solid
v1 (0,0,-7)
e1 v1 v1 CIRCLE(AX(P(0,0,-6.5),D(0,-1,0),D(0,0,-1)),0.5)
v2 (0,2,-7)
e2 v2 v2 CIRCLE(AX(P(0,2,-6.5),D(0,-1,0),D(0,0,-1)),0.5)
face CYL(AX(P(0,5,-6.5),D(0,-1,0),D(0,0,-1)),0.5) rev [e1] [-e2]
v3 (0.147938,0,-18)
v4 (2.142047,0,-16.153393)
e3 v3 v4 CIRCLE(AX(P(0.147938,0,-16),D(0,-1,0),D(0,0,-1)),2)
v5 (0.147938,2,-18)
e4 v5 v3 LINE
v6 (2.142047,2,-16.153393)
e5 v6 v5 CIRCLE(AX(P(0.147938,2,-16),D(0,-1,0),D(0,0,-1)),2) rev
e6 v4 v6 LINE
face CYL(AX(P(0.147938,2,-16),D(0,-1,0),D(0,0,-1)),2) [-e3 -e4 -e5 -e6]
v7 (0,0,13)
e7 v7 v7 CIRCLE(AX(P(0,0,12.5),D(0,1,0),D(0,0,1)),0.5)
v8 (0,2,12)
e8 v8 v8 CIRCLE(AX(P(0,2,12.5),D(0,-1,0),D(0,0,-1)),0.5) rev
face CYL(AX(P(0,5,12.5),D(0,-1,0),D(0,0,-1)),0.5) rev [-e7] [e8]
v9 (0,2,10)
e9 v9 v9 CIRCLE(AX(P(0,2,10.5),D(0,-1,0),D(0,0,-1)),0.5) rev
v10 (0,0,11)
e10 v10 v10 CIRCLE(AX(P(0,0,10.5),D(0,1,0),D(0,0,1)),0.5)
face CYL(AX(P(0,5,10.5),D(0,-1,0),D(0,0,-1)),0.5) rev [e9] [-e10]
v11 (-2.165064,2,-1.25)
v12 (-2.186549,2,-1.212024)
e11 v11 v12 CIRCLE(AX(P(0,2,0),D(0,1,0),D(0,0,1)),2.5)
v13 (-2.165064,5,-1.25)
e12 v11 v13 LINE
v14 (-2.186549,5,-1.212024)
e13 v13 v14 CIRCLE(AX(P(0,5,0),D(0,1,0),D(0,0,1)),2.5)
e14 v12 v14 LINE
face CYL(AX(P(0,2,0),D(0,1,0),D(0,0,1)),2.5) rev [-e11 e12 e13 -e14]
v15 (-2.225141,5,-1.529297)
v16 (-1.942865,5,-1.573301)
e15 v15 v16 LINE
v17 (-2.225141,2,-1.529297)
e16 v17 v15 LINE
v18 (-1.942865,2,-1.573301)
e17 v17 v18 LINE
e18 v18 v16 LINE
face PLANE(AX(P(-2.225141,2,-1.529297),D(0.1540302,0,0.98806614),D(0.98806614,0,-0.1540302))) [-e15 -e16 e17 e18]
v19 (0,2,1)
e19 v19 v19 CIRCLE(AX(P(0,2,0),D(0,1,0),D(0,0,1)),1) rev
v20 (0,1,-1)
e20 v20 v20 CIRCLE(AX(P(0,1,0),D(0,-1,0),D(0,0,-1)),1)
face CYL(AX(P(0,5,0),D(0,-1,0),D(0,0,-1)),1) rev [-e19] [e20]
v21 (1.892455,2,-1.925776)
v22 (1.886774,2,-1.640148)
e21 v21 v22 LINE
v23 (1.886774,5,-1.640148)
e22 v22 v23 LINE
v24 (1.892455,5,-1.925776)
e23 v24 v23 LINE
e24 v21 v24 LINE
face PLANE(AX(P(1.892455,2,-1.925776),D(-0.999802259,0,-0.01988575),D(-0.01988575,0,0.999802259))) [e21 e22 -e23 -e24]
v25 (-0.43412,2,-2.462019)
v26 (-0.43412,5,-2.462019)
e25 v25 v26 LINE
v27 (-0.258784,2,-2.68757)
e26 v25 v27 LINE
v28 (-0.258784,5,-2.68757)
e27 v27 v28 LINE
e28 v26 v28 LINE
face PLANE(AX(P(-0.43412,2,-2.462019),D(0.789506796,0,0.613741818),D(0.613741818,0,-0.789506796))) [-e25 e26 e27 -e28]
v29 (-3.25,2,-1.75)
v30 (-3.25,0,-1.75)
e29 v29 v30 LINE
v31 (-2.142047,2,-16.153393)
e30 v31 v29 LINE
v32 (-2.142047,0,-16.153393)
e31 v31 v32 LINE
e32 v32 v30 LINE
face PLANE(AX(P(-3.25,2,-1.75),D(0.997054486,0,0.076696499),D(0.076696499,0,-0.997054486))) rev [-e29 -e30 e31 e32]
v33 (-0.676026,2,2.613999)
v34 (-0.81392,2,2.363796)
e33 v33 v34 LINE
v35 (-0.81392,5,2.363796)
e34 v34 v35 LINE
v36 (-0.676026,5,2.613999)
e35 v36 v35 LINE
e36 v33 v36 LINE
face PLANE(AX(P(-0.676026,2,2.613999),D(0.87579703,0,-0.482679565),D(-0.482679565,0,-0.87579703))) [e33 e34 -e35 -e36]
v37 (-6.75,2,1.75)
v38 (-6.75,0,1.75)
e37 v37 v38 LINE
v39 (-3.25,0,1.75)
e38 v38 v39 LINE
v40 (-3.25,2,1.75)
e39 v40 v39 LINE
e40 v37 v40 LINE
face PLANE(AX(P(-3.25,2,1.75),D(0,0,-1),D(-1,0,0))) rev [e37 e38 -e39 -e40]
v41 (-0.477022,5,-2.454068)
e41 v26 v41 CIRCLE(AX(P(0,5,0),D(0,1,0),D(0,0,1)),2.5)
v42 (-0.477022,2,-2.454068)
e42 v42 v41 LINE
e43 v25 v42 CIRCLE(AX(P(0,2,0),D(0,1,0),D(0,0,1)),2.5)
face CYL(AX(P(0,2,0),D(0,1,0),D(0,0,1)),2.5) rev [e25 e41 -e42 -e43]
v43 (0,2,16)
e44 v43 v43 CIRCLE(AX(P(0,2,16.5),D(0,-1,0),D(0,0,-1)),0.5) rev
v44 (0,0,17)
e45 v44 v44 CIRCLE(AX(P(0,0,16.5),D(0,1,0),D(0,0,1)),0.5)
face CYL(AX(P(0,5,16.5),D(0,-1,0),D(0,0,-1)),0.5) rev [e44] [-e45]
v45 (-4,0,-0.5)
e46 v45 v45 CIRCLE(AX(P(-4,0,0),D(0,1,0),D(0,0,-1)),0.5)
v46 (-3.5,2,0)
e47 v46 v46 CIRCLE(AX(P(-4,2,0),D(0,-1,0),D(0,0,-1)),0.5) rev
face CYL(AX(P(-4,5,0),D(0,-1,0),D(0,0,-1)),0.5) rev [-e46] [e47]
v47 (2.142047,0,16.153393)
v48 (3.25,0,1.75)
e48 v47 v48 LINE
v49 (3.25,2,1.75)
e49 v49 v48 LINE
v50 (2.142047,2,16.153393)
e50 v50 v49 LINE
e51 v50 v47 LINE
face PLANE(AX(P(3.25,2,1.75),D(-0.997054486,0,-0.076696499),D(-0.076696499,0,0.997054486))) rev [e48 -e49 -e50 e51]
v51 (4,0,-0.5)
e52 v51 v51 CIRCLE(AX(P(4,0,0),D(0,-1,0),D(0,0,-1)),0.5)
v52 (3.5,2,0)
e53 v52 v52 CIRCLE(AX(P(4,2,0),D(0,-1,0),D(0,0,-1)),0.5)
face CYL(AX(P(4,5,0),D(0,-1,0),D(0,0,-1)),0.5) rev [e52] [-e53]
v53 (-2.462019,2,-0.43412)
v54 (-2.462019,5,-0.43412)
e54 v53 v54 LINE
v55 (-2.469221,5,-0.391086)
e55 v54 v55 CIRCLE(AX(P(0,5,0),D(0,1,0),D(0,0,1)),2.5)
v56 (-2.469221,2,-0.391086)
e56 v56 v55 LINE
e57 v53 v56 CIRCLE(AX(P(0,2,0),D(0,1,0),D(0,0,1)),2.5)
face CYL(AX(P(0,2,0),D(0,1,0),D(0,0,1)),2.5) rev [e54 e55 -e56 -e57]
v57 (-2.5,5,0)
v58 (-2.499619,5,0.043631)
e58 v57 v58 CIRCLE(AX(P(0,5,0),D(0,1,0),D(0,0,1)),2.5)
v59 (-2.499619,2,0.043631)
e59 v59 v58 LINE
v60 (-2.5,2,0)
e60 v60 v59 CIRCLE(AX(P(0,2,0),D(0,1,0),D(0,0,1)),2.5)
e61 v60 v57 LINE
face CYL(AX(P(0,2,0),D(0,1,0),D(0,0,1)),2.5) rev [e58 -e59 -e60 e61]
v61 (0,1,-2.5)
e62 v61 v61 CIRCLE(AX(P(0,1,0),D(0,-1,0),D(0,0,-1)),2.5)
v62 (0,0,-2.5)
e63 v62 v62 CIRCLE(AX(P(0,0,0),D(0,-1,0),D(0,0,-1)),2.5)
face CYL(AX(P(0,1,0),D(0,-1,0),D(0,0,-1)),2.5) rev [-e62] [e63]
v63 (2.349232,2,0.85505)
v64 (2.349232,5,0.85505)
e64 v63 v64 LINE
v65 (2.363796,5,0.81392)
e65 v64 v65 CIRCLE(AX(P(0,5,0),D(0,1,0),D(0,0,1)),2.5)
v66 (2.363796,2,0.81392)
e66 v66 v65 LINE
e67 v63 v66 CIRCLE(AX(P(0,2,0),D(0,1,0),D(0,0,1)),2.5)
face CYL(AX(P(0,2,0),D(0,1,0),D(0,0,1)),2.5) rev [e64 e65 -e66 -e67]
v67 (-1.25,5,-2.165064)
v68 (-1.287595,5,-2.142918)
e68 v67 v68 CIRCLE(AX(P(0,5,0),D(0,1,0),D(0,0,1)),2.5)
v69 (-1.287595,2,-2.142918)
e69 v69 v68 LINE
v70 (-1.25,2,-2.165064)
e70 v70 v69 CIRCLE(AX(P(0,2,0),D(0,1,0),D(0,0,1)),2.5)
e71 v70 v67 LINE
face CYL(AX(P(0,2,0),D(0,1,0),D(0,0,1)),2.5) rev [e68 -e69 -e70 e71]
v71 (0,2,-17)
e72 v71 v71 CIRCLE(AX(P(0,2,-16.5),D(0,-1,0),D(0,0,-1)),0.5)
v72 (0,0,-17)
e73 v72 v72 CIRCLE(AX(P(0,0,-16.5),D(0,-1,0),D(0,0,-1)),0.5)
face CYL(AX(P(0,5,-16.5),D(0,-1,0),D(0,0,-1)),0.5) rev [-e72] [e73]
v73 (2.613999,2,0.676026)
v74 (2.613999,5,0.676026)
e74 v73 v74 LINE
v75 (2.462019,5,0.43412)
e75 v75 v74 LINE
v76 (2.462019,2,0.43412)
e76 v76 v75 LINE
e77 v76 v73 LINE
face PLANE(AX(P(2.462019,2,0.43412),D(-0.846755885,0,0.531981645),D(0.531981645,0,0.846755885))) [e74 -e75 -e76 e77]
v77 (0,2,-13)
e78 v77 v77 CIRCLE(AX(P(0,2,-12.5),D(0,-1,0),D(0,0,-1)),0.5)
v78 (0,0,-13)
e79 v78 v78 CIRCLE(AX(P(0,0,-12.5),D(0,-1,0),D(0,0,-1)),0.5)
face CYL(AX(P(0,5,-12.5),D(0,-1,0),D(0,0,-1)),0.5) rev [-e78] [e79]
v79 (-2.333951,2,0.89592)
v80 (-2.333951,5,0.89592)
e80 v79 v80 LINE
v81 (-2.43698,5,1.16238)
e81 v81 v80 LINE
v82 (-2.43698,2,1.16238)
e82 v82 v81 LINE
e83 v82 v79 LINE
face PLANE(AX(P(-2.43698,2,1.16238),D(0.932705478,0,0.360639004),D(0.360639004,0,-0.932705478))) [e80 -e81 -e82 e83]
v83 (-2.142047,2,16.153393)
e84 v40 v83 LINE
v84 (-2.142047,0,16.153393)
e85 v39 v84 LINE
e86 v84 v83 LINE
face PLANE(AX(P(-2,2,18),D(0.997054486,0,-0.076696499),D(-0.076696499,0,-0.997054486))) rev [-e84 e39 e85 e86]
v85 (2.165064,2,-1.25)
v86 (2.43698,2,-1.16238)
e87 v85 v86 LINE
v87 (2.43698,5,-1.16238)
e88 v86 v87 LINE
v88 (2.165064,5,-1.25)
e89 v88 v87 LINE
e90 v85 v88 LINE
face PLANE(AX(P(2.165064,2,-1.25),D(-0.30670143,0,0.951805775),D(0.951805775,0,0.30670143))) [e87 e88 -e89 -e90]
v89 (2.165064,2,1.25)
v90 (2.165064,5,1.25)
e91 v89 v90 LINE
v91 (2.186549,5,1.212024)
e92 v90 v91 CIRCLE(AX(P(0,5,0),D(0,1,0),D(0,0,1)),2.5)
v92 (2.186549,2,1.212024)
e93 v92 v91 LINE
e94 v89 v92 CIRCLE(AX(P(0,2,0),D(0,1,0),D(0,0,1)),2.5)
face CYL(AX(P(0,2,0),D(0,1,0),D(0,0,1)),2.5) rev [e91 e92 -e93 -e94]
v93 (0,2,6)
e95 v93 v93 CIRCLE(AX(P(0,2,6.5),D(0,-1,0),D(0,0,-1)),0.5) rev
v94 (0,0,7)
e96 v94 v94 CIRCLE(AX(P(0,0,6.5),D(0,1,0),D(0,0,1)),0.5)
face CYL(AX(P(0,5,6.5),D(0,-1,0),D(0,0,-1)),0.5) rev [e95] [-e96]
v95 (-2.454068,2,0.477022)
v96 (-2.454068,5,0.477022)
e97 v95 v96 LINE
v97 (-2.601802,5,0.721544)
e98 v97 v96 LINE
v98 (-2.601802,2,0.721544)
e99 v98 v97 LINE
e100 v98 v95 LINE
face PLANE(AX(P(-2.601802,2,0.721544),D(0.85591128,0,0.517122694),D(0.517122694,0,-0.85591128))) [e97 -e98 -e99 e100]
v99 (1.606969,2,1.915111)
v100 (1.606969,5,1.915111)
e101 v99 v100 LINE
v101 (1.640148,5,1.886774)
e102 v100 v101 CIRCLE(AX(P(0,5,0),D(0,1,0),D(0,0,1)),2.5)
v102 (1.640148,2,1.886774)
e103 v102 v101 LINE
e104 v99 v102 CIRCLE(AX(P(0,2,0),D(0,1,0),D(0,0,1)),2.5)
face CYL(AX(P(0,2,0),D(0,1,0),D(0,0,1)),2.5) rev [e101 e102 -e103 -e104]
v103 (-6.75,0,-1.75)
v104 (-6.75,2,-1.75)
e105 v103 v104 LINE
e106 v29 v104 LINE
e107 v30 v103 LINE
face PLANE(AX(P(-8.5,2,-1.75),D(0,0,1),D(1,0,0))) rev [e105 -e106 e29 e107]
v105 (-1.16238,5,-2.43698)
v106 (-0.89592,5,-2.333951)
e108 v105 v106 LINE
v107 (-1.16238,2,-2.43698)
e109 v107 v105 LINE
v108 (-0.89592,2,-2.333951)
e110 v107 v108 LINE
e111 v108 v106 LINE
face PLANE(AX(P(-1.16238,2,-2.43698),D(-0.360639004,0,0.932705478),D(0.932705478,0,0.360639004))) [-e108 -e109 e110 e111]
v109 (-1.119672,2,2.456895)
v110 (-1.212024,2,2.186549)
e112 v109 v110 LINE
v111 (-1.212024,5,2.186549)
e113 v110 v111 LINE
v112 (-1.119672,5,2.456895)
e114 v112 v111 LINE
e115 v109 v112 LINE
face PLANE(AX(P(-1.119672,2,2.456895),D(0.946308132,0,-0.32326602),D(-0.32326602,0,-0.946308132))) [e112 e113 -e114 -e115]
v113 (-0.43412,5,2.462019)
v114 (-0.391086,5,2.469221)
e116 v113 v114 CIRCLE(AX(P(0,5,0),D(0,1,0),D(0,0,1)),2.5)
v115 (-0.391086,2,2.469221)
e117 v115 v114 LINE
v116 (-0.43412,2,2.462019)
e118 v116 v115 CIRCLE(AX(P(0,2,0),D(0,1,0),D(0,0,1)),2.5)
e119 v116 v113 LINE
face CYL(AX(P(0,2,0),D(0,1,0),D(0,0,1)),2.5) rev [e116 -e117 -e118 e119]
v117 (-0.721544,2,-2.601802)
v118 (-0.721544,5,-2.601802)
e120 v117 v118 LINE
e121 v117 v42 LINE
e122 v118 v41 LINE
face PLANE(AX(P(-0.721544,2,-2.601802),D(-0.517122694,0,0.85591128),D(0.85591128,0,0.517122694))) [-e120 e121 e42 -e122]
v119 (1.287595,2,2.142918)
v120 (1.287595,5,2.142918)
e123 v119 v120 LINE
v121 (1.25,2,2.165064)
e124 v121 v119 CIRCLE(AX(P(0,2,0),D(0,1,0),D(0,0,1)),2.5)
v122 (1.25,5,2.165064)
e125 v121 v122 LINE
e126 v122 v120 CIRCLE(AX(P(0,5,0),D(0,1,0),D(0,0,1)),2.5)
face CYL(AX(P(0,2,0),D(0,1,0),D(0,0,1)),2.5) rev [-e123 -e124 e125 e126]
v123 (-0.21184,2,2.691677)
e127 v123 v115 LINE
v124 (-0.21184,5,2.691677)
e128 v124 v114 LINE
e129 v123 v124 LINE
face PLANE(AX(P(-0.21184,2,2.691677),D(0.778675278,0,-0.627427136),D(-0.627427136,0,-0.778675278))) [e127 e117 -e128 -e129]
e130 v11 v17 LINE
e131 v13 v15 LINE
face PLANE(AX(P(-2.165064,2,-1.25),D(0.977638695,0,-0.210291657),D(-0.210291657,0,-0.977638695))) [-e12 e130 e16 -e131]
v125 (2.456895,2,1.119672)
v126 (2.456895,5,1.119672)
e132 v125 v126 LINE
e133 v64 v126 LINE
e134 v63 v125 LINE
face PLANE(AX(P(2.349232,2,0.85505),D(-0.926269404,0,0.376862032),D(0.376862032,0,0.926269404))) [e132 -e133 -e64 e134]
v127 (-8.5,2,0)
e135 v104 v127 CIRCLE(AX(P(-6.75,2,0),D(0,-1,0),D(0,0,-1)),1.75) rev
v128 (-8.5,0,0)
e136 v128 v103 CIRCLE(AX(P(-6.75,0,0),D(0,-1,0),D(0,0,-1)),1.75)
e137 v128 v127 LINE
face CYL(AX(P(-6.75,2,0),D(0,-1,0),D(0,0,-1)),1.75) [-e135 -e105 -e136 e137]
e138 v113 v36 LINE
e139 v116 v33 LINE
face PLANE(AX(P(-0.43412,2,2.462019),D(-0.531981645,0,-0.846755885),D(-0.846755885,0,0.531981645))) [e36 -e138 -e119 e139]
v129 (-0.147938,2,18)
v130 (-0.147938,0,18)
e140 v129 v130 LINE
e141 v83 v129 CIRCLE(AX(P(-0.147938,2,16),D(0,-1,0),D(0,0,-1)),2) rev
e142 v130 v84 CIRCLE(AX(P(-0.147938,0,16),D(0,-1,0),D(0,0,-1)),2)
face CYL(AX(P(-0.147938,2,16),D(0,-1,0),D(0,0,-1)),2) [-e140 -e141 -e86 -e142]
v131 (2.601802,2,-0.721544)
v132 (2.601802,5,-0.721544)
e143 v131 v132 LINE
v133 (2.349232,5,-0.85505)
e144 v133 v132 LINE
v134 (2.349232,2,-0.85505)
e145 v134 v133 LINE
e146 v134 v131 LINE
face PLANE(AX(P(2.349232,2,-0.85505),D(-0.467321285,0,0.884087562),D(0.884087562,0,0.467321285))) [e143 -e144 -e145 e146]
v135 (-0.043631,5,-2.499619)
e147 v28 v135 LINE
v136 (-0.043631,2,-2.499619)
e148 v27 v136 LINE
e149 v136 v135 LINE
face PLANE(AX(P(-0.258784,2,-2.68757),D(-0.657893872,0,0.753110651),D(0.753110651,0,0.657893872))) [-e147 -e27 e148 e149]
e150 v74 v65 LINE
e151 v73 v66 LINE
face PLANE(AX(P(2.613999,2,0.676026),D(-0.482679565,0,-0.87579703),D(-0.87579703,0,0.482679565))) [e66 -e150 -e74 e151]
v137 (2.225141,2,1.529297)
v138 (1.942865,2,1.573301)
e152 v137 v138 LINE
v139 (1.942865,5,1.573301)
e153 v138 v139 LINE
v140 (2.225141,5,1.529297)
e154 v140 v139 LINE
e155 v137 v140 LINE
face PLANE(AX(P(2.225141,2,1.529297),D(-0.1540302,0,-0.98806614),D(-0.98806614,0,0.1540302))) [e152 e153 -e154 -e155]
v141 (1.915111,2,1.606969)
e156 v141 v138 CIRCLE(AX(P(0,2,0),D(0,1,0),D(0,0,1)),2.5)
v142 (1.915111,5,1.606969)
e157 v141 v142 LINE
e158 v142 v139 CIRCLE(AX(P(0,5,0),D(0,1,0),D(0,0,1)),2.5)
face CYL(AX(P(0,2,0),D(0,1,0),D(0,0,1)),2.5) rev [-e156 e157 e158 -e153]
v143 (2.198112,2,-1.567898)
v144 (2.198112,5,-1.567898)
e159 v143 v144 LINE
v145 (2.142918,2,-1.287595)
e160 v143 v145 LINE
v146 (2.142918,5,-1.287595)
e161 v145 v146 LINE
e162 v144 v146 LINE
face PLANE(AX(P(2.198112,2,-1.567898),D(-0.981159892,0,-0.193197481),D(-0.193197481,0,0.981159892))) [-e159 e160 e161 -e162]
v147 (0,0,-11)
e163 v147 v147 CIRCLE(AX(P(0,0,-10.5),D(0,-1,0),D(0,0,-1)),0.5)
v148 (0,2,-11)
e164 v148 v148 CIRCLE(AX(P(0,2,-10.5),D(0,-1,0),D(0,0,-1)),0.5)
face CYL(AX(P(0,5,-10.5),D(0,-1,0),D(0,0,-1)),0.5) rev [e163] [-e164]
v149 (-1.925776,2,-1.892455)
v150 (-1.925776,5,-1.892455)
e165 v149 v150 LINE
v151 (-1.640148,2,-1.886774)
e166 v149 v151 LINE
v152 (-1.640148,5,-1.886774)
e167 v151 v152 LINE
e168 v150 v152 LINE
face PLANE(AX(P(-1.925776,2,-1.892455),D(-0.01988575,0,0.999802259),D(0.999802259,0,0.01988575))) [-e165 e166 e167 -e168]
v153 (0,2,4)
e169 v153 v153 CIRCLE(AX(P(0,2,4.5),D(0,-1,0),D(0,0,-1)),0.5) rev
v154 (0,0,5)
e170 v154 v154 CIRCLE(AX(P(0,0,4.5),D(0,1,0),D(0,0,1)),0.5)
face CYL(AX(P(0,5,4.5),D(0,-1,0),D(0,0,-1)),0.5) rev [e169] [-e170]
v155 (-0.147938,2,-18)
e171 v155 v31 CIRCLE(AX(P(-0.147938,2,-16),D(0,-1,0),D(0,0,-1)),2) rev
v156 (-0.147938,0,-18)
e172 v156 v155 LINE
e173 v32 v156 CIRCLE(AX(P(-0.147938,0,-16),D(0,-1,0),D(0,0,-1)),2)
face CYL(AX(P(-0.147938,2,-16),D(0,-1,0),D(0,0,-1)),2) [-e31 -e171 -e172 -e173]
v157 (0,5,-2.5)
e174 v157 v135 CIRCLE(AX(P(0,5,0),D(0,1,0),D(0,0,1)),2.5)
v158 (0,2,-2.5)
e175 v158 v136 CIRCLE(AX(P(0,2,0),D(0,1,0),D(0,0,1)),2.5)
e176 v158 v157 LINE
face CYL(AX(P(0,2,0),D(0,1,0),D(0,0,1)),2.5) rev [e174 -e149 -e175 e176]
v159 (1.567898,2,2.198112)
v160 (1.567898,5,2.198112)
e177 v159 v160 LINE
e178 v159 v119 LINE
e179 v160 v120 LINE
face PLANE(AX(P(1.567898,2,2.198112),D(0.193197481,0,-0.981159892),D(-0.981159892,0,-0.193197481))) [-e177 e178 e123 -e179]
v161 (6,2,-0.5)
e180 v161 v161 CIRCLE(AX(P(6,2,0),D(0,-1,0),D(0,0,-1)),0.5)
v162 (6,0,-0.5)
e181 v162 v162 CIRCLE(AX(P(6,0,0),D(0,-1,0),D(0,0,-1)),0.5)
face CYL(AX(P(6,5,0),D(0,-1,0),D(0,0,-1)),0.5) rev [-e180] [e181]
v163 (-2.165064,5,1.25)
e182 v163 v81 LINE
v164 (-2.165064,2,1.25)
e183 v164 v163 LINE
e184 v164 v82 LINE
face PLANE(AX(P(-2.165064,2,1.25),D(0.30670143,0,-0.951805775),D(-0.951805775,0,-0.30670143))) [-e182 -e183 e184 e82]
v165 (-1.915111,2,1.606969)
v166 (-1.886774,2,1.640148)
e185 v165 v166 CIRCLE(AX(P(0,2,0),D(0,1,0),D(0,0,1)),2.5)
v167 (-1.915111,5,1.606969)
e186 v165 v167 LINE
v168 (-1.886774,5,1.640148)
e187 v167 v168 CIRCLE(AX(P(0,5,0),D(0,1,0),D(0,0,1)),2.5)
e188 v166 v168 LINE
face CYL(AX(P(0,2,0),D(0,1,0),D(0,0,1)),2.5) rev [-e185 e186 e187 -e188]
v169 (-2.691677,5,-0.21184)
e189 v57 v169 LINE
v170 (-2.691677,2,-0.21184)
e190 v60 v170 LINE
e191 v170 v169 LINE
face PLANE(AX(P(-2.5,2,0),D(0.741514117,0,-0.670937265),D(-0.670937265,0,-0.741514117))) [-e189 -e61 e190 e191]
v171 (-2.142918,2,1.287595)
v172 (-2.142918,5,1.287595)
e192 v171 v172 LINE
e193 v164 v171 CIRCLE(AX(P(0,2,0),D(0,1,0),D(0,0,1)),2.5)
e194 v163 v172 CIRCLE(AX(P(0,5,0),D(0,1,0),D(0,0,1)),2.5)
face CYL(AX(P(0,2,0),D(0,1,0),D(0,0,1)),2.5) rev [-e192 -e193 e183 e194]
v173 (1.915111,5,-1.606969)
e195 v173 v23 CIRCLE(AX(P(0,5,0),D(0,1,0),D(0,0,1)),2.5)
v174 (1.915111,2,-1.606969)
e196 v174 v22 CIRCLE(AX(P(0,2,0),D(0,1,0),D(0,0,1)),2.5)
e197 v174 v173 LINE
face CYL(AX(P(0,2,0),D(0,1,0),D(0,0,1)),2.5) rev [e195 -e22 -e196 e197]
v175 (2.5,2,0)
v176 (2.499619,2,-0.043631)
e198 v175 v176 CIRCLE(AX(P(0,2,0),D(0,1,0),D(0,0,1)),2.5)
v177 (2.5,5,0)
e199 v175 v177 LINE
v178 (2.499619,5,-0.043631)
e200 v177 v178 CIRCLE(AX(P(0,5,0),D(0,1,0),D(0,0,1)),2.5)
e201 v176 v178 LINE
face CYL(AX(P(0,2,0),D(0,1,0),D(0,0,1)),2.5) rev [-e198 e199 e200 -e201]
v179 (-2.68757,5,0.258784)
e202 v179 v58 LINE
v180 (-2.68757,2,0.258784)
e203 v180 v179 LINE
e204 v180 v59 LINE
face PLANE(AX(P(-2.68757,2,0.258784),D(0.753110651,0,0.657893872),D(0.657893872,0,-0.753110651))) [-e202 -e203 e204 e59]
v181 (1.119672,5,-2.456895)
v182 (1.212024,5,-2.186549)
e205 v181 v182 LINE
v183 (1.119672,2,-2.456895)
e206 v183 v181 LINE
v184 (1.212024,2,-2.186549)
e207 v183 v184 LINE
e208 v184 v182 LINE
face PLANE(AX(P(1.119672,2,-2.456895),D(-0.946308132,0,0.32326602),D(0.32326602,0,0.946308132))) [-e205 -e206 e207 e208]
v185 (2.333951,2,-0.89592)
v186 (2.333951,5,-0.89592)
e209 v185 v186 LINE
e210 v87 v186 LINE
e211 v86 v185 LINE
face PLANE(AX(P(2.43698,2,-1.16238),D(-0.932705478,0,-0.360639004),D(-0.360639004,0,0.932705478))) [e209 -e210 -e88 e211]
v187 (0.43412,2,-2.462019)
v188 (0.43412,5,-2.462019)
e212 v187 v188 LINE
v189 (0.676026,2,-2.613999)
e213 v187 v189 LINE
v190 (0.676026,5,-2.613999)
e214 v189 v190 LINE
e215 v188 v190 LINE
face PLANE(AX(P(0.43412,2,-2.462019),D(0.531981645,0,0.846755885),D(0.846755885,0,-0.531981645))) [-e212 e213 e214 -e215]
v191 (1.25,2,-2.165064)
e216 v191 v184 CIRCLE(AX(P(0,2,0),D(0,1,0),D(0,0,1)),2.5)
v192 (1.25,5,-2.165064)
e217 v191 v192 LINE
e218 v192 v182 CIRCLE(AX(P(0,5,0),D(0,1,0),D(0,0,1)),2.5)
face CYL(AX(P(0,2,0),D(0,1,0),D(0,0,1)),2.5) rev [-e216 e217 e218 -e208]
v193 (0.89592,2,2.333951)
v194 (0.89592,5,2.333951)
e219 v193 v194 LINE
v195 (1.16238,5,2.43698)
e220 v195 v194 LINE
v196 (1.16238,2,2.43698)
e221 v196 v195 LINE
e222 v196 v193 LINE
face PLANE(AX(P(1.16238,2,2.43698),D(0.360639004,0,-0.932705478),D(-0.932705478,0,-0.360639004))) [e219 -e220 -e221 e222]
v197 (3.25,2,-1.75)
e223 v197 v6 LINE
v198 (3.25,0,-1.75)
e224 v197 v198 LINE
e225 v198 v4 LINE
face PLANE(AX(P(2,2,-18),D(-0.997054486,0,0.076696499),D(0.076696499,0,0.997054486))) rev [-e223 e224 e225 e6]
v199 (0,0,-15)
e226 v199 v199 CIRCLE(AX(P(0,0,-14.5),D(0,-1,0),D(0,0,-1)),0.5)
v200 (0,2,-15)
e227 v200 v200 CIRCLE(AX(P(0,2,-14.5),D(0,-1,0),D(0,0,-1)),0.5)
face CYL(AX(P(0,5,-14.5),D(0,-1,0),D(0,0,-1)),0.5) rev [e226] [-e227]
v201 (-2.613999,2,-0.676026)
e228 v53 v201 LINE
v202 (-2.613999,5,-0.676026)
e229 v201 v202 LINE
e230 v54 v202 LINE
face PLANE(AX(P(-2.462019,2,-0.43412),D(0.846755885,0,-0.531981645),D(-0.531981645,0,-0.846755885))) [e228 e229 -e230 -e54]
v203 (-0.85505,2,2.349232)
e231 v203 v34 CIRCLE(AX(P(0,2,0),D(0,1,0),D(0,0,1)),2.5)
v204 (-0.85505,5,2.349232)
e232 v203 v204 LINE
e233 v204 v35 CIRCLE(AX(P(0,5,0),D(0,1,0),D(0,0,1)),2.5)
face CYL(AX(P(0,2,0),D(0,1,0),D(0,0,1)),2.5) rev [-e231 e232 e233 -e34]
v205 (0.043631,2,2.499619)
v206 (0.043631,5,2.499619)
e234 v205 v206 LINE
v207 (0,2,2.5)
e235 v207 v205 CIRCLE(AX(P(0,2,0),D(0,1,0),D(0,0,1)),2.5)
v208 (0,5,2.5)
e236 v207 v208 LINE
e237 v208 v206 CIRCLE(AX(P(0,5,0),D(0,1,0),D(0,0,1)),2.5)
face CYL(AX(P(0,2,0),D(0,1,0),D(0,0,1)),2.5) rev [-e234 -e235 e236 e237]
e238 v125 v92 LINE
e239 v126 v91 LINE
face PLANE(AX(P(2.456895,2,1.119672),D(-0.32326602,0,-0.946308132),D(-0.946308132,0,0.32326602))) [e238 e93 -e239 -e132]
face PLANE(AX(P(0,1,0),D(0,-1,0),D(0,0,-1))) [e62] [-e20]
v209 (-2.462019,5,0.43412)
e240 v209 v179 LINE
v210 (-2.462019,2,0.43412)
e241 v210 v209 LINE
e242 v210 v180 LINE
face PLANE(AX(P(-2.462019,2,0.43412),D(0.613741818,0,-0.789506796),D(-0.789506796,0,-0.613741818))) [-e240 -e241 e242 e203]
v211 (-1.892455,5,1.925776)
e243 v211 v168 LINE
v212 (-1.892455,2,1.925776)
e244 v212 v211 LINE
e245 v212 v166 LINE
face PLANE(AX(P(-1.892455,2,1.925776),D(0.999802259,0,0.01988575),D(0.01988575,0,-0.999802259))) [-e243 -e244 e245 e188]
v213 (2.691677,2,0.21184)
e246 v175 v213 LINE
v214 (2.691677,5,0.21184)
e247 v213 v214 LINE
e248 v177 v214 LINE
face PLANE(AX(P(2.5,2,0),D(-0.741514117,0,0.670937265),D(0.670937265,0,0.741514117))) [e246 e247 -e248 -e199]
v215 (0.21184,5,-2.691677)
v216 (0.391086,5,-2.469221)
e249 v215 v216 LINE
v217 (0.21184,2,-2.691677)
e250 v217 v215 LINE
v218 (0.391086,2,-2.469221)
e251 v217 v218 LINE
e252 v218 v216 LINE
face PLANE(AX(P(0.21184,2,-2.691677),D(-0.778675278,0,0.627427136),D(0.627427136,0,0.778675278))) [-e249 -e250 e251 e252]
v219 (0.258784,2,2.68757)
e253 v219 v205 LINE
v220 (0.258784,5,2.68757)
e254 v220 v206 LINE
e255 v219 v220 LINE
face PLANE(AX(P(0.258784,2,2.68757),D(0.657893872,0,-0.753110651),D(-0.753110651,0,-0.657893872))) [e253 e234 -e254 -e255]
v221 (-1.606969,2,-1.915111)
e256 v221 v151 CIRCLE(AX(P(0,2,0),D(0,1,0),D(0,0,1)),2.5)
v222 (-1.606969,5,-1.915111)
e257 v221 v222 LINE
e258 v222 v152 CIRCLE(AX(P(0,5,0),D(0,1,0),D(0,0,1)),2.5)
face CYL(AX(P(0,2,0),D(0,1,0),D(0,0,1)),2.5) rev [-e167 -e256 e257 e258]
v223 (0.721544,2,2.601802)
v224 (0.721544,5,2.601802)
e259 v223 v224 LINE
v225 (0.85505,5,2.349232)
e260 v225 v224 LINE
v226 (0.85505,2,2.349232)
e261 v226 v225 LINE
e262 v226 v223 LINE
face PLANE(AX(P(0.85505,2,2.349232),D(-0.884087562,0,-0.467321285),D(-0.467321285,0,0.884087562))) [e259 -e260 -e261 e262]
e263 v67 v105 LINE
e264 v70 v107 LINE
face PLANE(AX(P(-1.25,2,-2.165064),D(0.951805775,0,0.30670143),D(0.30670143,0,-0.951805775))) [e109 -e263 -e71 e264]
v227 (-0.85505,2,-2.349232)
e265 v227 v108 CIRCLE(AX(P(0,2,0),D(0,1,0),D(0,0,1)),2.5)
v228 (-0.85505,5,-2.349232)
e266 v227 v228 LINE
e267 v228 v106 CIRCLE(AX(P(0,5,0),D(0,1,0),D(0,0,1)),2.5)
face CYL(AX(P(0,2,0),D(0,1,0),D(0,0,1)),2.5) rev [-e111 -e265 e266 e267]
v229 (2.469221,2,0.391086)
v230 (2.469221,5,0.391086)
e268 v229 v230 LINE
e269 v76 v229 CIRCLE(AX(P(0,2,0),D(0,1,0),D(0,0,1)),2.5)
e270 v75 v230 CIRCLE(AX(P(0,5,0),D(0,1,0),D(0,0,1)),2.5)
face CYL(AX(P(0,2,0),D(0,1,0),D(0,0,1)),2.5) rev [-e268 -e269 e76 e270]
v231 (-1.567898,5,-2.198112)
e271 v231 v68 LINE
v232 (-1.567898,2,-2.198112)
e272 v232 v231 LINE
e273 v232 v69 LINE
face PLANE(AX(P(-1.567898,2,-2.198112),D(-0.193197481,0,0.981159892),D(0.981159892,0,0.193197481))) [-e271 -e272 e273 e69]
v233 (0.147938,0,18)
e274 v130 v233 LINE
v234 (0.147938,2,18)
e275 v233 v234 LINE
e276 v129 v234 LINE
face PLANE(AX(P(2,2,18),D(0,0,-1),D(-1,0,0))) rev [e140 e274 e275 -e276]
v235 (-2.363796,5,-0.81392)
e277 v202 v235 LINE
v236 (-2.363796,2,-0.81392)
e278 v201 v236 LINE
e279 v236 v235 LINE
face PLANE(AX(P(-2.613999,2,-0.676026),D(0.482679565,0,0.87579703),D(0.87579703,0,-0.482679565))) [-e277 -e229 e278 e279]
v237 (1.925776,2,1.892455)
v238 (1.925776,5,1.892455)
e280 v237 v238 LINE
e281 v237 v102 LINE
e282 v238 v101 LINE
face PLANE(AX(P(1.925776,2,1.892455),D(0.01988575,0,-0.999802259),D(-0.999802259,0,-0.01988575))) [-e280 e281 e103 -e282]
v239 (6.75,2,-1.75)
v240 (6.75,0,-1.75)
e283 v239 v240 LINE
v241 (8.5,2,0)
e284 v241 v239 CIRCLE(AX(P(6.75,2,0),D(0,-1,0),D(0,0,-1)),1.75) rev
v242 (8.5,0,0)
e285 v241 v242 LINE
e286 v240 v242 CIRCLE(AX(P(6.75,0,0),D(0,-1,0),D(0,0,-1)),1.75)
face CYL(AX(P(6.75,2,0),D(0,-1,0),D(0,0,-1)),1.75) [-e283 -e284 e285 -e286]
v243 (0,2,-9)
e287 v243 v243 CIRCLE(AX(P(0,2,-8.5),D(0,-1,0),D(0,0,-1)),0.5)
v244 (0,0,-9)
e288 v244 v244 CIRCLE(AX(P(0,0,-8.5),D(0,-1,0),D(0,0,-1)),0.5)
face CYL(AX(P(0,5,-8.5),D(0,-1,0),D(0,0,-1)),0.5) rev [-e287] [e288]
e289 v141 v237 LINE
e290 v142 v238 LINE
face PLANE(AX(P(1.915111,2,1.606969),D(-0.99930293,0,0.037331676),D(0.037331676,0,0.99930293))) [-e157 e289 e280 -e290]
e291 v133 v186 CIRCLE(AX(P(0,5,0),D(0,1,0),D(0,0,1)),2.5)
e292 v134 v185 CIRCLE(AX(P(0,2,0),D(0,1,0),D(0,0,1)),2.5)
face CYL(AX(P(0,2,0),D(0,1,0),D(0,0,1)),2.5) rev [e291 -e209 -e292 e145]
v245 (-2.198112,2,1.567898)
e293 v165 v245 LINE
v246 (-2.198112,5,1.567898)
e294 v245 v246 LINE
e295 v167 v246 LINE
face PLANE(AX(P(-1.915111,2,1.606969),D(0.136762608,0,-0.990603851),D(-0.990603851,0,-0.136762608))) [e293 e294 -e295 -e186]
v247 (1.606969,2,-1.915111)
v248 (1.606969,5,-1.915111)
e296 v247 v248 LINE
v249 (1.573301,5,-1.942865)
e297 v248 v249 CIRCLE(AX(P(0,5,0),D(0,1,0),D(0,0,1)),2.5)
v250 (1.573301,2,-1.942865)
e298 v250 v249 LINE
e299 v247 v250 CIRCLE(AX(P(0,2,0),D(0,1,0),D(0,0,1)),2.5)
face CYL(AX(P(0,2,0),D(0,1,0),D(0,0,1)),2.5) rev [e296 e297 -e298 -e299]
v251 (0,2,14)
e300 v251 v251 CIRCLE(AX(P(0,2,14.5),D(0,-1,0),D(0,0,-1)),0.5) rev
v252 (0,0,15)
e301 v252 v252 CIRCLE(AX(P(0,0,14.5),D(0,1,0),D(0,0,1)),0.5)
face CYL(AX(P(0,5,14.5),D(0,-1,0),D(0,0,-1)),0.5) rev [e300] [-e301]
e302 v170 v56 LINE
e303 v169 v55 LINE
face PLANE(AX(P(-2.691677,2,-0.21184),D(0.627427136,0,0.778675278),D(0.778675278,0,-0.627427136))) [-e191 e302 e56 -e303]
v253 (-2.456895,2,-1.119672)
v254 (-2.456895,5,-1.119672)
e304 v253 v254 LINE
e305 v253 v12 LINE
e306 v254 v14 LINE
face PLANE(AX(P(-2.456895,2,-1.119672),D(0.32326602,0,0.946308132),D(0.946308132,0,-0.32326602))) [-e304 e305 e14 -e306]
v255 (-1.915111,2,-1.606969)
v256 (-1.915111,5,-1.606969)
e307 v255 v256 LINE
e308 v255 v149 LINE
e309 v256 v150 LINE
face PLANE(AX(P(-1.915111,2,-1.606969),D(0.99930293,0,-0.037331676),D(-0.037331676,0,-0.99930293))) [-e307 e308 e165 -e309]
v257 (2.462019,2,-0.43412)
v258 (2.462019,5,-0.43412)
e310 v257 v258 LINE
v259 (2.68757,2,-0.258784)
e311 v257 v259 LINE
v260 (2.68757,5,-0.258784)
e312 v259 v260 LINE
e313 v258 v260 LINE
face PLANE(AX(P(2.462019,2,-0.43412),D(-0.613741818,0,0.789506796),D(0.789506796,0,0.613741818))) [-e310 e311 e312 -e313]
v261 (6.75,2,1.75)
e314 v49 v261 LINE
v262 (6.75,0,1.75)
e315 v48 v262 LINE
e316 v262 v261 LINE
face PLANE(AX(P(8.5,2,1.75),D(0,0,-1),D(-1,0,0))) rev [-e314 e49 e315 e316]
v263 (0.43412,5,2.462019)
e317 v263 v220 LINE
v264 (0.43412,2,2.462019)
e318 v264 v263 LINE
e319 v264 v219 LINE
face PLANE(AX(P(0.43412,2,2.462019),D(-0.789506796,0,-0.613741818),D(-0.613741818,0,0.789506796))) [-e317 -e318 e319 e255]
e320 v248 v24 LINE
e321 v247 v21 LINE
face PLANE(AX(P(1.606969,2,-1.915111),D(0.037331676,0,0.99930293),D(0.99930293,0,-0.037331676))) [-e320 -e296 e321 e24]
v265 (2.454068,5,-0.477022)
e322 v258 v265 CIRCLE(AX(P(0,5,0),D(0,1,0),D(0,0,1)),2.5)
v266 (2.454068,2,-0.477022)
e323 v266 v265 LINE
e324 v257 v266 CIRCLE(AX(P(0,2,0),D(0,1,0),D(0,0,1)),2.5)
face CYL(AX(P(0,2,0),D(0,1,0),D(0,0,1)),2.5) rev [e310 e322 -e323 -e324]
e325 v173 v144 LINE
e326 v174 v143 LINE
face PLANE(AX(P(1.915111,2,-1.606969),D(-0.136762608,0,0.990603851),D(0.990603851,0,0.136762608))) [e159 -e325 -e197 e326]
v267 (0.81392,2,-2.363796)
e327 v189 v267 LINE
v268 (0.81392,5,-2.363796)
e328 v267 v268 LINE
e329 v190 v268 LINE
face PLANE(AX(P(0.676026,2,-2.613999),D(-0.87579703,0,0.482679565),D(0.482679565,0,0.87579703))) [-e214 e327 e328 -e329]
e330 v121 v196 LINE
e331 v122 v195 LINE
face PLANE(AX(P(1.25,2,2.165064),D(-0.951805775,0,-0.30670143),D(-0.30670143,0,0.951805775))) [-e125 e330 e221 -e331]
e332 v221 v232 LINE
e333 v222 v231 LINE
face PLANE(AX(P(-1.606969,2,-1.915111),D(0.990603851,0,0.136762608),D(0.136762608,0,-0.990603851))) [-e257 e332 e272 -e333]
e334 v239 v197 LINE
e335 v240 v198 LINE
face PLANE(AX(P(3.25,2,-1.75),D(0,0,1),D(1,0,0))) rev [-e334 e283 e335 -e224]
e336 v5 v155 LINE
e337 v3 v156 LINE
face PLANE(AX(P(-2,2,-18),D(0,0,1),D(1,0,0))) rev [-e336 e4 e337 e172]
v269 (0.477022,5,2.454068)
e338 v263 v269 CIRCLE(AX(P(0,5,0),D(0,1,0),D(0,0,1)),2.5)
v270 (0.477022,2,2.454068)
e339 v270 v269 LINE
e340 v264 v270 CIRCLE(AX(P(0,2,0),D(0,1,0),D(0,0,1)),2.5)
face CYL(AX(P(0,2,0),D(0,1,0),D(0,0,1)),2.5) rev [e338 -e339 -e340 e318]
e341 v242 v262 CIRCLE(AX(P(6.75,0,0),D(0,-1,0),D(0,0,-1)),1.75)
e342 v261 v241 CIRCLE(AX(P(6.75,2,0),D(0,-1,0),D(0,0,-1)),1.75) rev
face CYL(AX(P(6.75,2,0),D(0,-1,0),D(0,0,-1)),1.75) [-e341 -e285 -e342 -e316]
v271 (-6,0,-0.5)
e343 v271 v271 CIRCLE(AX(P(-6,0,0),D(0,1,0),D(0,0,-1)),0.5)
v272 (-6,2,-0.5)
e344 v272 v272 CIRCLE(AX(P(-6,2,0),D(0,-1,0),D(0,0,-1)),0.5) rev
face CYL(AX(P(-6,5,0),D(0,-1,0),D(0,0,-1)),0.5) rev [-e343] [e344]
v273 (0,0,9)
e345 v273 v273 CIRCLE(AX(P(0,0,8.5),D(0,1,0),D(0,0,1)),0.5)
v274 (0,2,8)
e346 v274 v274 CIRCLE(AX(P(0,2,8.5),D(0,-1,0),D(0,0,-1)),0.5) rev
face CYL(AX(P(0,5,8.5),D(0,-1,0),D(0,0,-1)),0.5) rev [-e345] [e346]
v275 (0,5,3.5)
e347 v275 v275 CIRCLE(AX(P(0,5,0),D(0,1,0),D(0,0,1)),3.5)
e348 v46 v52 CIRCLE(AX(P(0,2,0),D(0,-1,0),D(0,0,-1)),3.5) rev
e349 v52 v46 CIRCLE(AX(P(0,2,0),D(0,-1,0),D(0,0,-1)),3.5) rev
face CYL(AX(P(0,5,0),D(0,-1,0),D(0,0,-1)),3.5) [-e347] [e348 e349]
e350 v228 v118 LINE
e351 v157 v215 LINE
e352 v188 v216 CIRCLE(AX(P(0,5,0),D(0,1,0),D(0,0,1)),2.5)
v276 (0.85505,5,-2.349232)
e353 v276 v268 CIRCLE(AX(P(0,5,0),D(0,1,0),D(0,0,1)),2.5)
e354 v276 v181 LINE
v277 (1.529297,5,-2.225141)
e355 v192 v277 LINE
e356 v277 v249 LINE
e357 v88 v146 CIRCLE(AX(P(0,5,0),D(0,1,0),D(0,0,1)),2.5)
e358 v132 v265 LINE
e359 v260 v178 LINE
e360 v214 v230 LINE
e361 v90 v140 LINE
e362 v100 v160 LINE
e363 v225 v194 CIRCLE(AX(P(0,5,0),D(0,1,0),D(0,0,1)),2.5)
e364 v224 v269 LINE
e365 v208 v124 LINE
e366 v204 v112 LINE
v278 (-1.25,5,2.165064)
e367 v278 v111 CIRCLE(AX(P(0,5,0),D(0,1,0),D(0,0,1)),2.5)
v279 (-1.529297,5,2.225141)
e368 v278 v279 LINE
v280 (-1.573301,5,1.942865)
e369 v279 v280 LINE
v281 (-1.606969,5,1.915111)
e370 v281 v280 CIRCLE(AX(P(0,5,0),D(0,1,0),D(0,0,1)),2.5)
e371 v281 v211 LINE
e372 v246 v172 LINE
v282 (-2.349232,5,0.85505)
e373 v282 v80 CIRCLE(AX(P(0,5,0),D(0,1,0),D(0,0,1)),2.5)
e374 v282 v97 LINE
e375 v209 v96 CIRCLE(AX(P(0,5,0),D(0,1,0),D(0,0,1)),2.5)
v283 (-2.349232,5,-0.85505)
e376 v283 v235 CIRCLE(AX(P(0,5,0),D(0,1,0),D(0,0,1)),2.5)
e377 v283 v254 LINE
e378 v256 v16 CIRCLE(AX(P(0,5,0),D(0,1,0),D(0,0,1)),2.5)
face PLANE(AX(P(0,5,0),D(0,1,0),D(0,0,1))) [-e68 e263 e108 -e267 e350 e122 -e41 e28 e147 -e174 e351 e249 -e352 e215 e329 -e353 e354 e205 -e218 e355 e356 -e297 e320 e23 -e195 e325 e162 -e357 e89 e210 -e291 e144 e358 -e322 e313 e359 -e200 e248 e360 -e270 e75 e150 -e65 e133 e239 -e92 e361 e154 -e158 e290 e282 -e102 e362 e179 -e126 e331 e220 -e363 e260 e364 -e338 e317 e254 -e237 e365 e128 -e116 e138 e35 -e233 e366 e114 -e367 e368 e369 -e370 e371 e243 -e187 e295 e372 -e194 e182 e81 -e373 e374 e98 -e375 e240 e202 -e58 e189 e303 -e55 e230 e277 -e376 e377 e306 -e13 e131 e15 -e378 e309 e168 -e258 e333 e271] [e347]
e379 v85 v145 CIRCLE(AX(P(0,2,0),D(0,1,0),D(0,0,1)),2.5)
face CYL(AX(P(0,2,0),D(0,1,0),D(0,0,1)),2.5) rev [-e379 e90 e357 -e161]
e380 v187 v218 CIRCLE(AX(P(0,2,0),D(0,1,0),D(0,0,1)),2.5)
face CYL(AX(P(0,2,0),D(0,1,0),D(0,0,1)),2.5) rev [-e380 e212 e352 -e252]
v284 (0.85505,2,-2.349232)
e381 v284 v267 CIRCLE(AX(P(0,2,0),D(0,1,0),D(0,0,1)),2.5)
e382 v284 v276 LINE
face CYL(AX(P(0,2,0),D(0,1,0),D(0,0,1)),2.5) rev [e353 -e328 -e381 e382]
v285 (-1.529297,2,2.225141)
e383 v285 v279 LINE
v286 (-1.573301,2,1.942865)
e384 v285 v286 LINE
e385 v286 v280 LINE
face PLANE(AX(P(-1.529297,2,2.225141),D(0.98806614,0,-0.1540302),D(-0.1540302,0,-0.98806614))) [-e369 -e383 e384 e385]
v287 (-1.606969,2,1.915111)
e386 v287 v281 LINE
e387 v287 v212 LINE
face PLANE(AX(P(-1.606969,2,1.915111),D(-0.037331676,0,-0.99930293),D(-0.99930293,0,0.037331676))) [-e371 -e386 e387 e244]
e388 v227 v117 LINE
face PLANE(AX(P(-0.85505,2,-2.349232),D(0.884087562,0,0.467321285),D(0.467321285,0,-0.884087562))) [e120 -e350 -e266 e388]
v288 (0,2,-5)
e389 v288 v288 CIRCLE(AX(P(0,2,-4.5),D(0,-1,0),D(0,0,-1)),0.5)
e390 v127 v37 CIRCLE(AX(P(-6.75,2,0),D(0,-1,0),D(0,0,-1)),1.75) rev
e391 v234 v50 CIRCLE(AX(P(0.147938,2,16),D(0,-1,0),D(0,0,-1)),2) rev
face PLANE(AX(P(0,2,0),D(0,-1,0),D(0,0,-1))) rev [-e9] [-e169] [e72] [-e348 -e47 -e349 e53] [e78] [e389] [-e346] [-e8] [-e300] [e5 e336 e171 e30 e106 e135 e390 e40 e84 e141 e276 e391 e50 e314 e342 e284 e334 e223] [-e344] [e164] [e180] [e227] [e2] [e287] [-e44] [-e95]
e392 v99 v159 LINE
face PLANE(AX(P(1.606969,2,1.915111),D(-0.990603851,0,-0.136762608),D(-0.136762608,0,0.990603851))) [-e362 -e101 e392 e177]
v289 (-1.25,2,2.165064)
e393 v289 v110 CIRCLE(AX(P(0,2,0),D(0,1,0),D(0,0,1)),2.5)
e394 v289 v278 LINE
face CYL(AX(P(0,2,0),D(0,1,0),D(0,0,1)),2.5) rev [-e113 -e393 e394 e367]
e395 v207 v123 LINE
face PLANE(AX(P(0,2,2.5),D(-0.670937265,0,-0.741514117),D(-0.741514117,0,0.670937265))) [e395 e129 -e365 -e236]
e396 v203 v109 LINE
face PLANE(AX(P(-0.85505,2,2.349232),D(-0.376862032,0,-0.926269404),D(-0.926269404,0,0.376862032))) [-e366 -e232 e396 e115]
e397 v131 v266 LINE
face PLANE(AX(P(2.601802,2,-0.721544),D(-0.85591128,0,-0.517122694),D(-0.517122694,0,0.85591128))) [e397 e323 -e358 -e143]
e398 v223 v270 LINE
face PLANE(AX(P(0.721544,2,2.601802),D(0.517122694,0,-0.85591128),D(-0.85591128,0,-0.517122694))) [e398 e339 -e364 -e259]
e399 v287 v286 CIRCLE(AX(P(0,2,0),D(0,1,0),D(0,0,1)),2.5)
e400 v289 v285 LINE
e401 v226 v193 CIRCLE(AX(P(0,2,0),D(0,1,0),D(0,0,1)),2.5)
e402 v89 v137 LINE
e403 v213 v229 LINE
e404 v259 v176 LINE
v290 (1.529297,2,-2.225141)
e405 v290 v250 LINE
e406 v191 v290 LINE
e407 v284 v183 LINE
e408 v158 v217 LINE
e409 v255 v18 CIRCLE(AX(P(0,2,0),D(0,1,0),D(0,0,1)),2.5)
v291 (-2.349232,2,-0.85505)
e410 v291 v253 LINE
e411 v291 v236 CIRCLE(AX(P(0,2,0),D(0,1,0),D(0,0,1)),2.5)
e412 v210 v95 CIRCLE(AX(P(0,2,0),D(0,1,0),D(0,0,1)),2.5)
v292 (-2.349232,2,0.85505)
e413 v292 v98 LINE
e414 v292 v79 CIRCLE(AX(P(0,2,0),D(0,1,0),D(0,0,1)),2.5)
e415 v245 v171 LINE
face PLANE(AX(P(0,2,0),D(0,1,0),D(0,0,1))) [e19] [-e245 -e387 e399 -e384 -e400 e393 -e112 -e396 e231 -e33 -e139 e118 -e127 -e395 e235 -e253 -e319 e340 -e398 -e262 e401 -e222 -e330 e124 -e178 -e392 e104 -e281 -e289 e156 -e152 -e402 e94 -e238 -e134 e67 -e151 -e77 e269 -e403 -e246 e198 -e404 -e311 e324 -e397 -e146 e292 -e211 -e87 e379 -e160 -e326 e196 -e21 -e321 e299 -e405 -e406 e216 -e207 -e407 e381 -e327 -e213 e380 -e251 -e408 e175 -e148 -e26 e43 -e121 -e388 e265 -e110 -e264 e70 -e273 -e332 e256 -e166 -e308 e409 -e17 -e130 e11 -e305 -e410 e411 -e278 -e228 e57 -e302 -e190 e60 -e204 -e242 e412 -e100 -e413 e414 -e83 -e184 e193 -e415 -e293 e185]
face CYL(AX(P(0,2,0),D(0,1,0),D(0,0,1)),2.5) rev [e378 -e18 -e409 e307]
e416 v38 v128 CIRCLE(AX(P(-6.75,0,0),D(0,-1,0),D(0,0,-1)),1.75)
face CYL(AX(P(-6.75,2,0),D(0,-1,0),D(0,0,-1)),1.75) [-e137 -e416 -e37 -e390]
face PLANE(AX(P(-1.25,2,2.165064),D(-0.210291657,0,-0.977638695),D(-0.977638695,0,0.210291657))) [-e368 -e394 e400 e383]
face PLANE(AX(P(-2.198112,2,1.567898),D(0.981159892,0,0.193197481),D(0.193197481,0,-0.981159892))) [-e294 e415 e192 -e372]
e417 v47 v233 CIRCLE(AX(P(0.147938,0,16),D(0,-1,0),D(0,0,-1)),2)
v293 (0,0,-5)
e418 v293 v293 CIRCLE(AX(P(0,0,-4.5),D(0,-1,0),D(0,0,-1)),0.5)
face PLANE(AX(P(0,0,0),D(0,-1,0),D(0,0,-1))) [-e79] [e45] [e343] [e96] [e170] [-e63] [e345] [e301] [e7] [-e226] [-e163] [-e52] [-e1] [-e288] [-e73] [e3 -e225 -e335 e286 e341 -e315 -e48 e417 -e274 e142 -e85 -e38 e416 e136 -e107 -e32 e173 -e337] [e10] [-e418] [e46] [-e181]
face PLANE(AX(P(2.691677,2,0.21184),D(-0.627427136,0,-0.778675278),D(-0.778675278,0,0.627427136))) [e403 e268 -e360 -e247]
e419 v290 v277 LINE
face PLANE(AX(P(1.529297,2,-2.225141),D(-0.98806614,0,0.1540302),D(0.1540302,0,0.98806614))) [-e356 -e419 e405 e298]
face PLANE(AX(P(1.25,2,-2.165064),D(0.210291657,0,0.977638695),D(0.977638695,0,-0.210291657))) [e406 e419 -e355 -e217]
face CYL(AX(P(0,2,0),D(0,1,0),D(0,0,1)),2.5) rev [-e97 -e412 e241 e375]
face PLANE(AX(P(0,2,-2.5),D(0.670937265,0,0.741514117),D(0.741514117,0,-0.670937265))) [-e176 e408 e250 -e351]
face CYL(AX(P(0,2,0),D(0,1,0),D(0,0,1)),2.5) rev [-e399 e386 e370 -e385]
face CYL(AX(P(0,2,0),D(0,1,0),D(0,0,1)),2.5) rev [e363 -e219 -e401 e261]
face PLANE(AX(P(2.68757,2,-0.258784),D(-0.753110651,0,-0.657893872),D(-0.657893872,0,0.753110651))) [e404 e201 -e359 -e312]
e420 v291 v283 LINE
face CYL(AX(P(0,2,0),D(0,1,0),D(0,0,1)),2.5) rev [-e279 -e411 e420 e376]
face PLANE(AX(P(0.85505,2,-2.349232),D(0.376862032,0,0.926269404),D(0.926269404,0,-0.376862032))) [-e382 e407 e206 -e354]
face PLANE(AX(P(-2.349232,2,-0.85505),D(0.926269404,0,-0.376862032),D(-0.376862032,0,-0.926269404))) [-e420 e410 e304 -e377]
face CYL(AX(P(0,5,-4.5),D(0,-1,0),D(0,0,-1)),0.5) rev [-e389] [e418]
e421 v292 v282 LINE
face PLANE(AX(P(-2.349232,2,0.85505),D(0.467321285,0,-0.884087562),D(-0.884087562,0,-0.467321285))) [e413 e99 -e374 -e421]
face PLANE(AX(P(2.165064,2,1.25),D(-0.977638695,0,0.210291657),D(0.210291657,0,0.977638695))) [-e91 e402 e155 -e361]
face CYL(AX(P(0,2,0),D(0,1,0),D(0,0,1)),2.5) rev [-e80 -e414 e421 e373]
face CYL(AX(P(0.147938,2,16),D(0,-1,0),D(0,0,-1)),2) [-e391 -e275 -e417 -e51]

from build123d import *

# Parameters (mm, degrees)
BOSS_EXTRUDE1_DEPTH     = 2
FILLET1_R               = 2
FILLET2_R               = 1.75
SKETCH2_R               = 3.5
BOSS_EXTRUDE2_DEPTH     = 3
SKETCH3_R               = 2.5
CUT_EXTRUDE1_DEPTH      = 1
SKETCH4_R               = 1
CUT_EXTRUDE2_DEPTH      = 21.303940504
CUT_EXTRUDE3_START      = -3
SKETCH5_R               = 2.5
CUT_EXTRUDE3_DEPTH      = 3
CUT_EXTRUDE4_DEPTH      = 3
CIRPATTERN1_COUNT       = 36
SKETCH9_R               = 0.5
CUT_EXTRUDE5_DEPTH      = 21.524375752
LPATTERN1_COUNT         = 7
LPATTERN1_PITCH         = 2
MIRROR1_COPY_1_SKETCH_R = 0.5
MIRROR1_COPY_1_DEPTH    = 21.524375752
MIRROR1_COPY_2_SKETCH_R = 0.5
MIRROR1_COPY_2_DEPTH    = 21.524375752
MIRROR1_COPY_3_SKETCH_R = 0.5
MIRROR1_COPY_3_DEPTH    = 21.524375752
MIRROR1_COPY_4_SKETCH_R = 0.5
MIRROR1_COPY_4_DEPTH    = 21.524375752
MIRROR1_COPY_5_SKETCH_R = 0.5
MIRROR1_COPY_5_DEPTH    = 21.524375752
MIRROR1_COPY_6_SKETCH_R = 0.5
MIRROR1_COPY_6_DEPTH    = 21.524375752
SKETCH11_R              = 0.5
CUT_EXTRUDE6_DEPTH      = 21.524375752
LPATTERN2_COUNT         = 2
LPATTERN2_PITCH         = 2
MIRROR2_COPY_1_SKETCH_R = 0.5
MIRROR2_COPY_1_DEPTH    = 21.524375752


with BuildPart() as part:
    # Sketch1 → Boss-Extrude1 (new body)
    with BuildSketch(Plane(origin=(0, 0, 0), x_dir=(1, 0, 0), z_dir=(0, 1, 0))):
        Polygon((-8.5, 1.75), (-3.25, 1.75), (-2, 18), (2, 18), (3.25, 1.75), (8.5, 1.75), (8.5, -1.75), (3.25, -1.75), (2, -18), (-2, -18), (-3.25, -1.75), (-8.5, -1.75), align=None)
    extrude(amount=BOSS_EXTRUDE1_DEPTH)

    # Fillet1
    fillet1_edges = [part.edges().sort_by_distance(p)[0] for p in [
        (-2, 1, -18),
        (2, 1, -18),
        (2, 1, 18),
        (-2, 1, 18),
    ]]
    fillet(fillet1_edges, radius=FILLET1_R)

    # Fillet2
    fillet2_edges = [part.edges().sort_by_distance(p)[0] for p in [
        (-8.5, 1, -1.75),
        (-8.5, 1, 1.75),
        (8.5, 1, -1.75),
        (8.5, 1, 1.75),
    ]]
    fillet(fillet2_edges, radius=FILLET2_R - 0.0001)  # a hair under: the kernel refuses the full size

    # Sketch2 → Boss-Extrude2 (add)
    with BuildSketch(Plane(origin=(0, 2, 0), x_dir=(1, 0, 0), z_dir=(0, 1, 0))):
        with Locations(Location((0, 0, 0), (0, 0, 90))):
            Circle(SKETCH2_R)
    extrude(amount=BOSS_EXTRUDE2_DEPTH)

    # Sketch3 → Cut-Extrude1 (cut)
    with BuildSketch(Plane(origin=(0, 0, 0), x_dir=(-1, 0, 0), z_dir=(0, -1, 0))):
        with Locations(Location((0, 0, 0), (0, 0, 90))):
            Circle(SKETCH3_R)
    extrude(amount=-CUT_EXTRUDE1_DEPTH, mode=Mode.SUBTRACT)

    # Sketch4 → Cut-Extrude2 (cut, through all)
    with BuildSketch(Plane(origin=(0, 1, 0), x_dir=(-1, 0, 0), z_dir=(0, -1, 0))):
        with Locations(Location((0, 0, 0), (0, 0, 90))):
            Circle(SKETCH4_R)
    extrude(amount=-CUT_EXTRUDE2_DEPTH, mode=Mode.SUBTRACT)

    # Sketch5 → Cut-Extrude3 (cut)
    with BuildSketch(Plane(origin=(0, 5, 0), x_dir=(1, 0, 0), z_dir=(0, 1, 0)).offset(CUT_EXTRUDE3_START)):
        with Locations(Location((0, 0, 0), (0, 0, 90))):
            Circle(SKETCH5_R)
    extrude(amount=CUT_EXTRUDE3_DEPTH, mode=Mode.SUBTRACT)

    # Sketch6 → Cut-Extrude4 (cut)
    with BuildSketch(Plane(origin=(0, 5, 0), x_dir=(1, 0, 0), z_dir=(0, 1, 0))):
        Polygon((-2.5, 0), (-2.691676801, 0.211839558), (-2.469220851, 0.391086163), align=None)
    cut_extrude4 = extrude(amount=-CUT_EXTRUDE4_DEPTH, mode=Mode.SUBTRACT)

    # CirPattern1: Cut-Extrude4 ×36 about axis
    cirpattern1_axis = Axis((0, 0, 0), (0, 1, 0))
    for i in range(1, CIRPATTERN1_COUNT):
        add(cut_extrude4.rotate(cirpattern1_axis, i * 360 / CIRPATTERN1_COUNT), mode=Mode.SUBTRACT)

    # Sketch9 → Cut-Extrude5 (cut, through all)
    with BuildSketch(Plane(origin=(0, 0, 0), x_dir=(-1, 0, 0), z_dir=(0, -1, 0))):
        with Locations(Location((0, 16.5, 0), (0, 0, 90))):
            Circle(SKETCH9_R)
    cut_extrude5 = extrude(amount=-CUT_EXTRUDE5_DEPTH, mode=Mode.SUBTRACT)

    # LPattern1: Cut-Extrude5 ×7
    with Locations(*[(0, 0, i * LPATTERN1_PITCH) for i in range(1, LPATTERN1_COUNT)]):
        add(cut_extrude5, mode=Mode.SUBTRACT)

    # Mirror1: Cut-Extrude5 across plane
    add(cut_extrude5.mirror(Plane.XY), mode=Mode.SUBTRACT)

    # Mirror1 copy 1 sketch → Mirror1 copy 1 (cut, through all)
    with BuildSketch(Plane(origin=(0, 0, -2), x_dir=(-1, 0, 0), z_dir=(0, -1, 0))):
        with Locations((0, -16.5)):
            Circle(MIRROR1_COPY_1_SKETCH_R)
    extrude(amount=-MIRROR1_COPY_1_DEPTH, mode=Mode.SUBTRACT)

    # Mirror1 copy 2 sketch → Mirror1 copy 2 (cut, through all)
    with BuildSketch(Plane(origin=(0, 0, -4), x_dir=(-1, 0, 0), z_dir=(0, -1, 0))):
        with Locations((0, -16.5)):
            Circle(MIRROR1_COPY_2_SKETCH_R)
    extrude(amount=-MIRROR1_COPY_2_DEPTH, mode=Mode.SUBTRACT)

    # Mirror1 copy 3 sketch → Mirror1 copy 3 (cut, through all)
    with BuildSketch(Plane(origin=(0, 0, -6), x_dir=(-1, 0, 0), z_dir=(0, -1, 0))):
        with Locations((0, -16.5)):
            Circle(MIRROR1_COPY_3_SKETCH_R)
    extrude(amount=-MIRROR1_COPY_3_DEPTH, mode=Mode.SUBTRACT)

    # Mirror1 copy 4 sketch → Mirror1 copy 4 (cut, through all)
    with BuildSketch(Plane(origin=(0, 0, -8), x_dir=(-1, 0, 0), z_dir=(0, -1, 0))):
        with Locations((0, -16.5)):
            Circle(MIRROR1_COPY_4_SKETCH_R)
    extrude(amount=-MIRROR1_COPY_4_DEPTH, mode=Mode.SUBTRACT)

    # Mirror1 copy 5 sketch → Mirror1 copy 5 (cut, through all)
    with BuildSketch(Plane(origin=(0, 0, -10), x_dir=(-1, 0, 0), z_dir=(0, -1, 0))):
        with Locations((0, -16.5)):
            Circle(MIRROR1_COPY_5_SKETCH_R)
    extrude(amount=-MIRROR1_COPY_5_DEPTH, mode=Mode.SUBTRACT)

    # Mirror1 copy 6 sketch → Mirror1 copy 6 (cut, through all)
    with BuildSketch(Plane(origin=(0, 0, -12), x_dir=(-1, 0, 0), z_dir=(0, -1, 0))):
        with Locations((0, -16.5)):
            Circle(MIRROR1_COPY_6_SKETCH_R)
    extrude(amount=-MIRROR1_COPY_6_DEPTH, mode=Mode.SUBTRACT)

    # Sketch11 → Cut-Extrude6 (cut, through all)
    with BuildSketch(Plane(origin=(0, 0, 0), x_dir=(-1, 0, 0), z_dir=(0, -1, 0))):
        with Locations(Location((-6, 0, 0), (0, 0, 90))):
            Circle(SKETCH11_R)
    cut_extrude6 = extrude(amount=-CUT_EXTRUDE6_DEPTH, mode=Mode.SUBTRACT)

    # LPattern2: Cut-Extrude6 ×2
    with Locations(*[(-i * LPATTERN2_PITCH, 0, 0) for i in range(1, LPATTERN2_COUNT)]):
        add(cut_extrude6, mode=Mode.SUBTRACT)

    # Mirror2: Cut-Extrude6 across plane
    add(cut_extrude6.mirror(Plane(origin=(0, 0, 0), x_dir=(0, 0, 1), z_dir=(1, 0, 0))), mode=Mode.SUBTRACT)

    # Mirror2 copy 1 sketch → Mirror2 copy 1 (cut, through all)
    with BuildSketch(Plane(origin=(2, 0, 0), x_dir=(1, 0, 0), z_dir=(0, -1, 0))):
        with Locations((-6, 0)):
            Circle(MIRROR2_COPY_1_SKETCH_R)
    extrude(amount=-MIRROR2_COPY_1_DEPTH, mode=Mode.SUBTRACT)


solid = part.part
